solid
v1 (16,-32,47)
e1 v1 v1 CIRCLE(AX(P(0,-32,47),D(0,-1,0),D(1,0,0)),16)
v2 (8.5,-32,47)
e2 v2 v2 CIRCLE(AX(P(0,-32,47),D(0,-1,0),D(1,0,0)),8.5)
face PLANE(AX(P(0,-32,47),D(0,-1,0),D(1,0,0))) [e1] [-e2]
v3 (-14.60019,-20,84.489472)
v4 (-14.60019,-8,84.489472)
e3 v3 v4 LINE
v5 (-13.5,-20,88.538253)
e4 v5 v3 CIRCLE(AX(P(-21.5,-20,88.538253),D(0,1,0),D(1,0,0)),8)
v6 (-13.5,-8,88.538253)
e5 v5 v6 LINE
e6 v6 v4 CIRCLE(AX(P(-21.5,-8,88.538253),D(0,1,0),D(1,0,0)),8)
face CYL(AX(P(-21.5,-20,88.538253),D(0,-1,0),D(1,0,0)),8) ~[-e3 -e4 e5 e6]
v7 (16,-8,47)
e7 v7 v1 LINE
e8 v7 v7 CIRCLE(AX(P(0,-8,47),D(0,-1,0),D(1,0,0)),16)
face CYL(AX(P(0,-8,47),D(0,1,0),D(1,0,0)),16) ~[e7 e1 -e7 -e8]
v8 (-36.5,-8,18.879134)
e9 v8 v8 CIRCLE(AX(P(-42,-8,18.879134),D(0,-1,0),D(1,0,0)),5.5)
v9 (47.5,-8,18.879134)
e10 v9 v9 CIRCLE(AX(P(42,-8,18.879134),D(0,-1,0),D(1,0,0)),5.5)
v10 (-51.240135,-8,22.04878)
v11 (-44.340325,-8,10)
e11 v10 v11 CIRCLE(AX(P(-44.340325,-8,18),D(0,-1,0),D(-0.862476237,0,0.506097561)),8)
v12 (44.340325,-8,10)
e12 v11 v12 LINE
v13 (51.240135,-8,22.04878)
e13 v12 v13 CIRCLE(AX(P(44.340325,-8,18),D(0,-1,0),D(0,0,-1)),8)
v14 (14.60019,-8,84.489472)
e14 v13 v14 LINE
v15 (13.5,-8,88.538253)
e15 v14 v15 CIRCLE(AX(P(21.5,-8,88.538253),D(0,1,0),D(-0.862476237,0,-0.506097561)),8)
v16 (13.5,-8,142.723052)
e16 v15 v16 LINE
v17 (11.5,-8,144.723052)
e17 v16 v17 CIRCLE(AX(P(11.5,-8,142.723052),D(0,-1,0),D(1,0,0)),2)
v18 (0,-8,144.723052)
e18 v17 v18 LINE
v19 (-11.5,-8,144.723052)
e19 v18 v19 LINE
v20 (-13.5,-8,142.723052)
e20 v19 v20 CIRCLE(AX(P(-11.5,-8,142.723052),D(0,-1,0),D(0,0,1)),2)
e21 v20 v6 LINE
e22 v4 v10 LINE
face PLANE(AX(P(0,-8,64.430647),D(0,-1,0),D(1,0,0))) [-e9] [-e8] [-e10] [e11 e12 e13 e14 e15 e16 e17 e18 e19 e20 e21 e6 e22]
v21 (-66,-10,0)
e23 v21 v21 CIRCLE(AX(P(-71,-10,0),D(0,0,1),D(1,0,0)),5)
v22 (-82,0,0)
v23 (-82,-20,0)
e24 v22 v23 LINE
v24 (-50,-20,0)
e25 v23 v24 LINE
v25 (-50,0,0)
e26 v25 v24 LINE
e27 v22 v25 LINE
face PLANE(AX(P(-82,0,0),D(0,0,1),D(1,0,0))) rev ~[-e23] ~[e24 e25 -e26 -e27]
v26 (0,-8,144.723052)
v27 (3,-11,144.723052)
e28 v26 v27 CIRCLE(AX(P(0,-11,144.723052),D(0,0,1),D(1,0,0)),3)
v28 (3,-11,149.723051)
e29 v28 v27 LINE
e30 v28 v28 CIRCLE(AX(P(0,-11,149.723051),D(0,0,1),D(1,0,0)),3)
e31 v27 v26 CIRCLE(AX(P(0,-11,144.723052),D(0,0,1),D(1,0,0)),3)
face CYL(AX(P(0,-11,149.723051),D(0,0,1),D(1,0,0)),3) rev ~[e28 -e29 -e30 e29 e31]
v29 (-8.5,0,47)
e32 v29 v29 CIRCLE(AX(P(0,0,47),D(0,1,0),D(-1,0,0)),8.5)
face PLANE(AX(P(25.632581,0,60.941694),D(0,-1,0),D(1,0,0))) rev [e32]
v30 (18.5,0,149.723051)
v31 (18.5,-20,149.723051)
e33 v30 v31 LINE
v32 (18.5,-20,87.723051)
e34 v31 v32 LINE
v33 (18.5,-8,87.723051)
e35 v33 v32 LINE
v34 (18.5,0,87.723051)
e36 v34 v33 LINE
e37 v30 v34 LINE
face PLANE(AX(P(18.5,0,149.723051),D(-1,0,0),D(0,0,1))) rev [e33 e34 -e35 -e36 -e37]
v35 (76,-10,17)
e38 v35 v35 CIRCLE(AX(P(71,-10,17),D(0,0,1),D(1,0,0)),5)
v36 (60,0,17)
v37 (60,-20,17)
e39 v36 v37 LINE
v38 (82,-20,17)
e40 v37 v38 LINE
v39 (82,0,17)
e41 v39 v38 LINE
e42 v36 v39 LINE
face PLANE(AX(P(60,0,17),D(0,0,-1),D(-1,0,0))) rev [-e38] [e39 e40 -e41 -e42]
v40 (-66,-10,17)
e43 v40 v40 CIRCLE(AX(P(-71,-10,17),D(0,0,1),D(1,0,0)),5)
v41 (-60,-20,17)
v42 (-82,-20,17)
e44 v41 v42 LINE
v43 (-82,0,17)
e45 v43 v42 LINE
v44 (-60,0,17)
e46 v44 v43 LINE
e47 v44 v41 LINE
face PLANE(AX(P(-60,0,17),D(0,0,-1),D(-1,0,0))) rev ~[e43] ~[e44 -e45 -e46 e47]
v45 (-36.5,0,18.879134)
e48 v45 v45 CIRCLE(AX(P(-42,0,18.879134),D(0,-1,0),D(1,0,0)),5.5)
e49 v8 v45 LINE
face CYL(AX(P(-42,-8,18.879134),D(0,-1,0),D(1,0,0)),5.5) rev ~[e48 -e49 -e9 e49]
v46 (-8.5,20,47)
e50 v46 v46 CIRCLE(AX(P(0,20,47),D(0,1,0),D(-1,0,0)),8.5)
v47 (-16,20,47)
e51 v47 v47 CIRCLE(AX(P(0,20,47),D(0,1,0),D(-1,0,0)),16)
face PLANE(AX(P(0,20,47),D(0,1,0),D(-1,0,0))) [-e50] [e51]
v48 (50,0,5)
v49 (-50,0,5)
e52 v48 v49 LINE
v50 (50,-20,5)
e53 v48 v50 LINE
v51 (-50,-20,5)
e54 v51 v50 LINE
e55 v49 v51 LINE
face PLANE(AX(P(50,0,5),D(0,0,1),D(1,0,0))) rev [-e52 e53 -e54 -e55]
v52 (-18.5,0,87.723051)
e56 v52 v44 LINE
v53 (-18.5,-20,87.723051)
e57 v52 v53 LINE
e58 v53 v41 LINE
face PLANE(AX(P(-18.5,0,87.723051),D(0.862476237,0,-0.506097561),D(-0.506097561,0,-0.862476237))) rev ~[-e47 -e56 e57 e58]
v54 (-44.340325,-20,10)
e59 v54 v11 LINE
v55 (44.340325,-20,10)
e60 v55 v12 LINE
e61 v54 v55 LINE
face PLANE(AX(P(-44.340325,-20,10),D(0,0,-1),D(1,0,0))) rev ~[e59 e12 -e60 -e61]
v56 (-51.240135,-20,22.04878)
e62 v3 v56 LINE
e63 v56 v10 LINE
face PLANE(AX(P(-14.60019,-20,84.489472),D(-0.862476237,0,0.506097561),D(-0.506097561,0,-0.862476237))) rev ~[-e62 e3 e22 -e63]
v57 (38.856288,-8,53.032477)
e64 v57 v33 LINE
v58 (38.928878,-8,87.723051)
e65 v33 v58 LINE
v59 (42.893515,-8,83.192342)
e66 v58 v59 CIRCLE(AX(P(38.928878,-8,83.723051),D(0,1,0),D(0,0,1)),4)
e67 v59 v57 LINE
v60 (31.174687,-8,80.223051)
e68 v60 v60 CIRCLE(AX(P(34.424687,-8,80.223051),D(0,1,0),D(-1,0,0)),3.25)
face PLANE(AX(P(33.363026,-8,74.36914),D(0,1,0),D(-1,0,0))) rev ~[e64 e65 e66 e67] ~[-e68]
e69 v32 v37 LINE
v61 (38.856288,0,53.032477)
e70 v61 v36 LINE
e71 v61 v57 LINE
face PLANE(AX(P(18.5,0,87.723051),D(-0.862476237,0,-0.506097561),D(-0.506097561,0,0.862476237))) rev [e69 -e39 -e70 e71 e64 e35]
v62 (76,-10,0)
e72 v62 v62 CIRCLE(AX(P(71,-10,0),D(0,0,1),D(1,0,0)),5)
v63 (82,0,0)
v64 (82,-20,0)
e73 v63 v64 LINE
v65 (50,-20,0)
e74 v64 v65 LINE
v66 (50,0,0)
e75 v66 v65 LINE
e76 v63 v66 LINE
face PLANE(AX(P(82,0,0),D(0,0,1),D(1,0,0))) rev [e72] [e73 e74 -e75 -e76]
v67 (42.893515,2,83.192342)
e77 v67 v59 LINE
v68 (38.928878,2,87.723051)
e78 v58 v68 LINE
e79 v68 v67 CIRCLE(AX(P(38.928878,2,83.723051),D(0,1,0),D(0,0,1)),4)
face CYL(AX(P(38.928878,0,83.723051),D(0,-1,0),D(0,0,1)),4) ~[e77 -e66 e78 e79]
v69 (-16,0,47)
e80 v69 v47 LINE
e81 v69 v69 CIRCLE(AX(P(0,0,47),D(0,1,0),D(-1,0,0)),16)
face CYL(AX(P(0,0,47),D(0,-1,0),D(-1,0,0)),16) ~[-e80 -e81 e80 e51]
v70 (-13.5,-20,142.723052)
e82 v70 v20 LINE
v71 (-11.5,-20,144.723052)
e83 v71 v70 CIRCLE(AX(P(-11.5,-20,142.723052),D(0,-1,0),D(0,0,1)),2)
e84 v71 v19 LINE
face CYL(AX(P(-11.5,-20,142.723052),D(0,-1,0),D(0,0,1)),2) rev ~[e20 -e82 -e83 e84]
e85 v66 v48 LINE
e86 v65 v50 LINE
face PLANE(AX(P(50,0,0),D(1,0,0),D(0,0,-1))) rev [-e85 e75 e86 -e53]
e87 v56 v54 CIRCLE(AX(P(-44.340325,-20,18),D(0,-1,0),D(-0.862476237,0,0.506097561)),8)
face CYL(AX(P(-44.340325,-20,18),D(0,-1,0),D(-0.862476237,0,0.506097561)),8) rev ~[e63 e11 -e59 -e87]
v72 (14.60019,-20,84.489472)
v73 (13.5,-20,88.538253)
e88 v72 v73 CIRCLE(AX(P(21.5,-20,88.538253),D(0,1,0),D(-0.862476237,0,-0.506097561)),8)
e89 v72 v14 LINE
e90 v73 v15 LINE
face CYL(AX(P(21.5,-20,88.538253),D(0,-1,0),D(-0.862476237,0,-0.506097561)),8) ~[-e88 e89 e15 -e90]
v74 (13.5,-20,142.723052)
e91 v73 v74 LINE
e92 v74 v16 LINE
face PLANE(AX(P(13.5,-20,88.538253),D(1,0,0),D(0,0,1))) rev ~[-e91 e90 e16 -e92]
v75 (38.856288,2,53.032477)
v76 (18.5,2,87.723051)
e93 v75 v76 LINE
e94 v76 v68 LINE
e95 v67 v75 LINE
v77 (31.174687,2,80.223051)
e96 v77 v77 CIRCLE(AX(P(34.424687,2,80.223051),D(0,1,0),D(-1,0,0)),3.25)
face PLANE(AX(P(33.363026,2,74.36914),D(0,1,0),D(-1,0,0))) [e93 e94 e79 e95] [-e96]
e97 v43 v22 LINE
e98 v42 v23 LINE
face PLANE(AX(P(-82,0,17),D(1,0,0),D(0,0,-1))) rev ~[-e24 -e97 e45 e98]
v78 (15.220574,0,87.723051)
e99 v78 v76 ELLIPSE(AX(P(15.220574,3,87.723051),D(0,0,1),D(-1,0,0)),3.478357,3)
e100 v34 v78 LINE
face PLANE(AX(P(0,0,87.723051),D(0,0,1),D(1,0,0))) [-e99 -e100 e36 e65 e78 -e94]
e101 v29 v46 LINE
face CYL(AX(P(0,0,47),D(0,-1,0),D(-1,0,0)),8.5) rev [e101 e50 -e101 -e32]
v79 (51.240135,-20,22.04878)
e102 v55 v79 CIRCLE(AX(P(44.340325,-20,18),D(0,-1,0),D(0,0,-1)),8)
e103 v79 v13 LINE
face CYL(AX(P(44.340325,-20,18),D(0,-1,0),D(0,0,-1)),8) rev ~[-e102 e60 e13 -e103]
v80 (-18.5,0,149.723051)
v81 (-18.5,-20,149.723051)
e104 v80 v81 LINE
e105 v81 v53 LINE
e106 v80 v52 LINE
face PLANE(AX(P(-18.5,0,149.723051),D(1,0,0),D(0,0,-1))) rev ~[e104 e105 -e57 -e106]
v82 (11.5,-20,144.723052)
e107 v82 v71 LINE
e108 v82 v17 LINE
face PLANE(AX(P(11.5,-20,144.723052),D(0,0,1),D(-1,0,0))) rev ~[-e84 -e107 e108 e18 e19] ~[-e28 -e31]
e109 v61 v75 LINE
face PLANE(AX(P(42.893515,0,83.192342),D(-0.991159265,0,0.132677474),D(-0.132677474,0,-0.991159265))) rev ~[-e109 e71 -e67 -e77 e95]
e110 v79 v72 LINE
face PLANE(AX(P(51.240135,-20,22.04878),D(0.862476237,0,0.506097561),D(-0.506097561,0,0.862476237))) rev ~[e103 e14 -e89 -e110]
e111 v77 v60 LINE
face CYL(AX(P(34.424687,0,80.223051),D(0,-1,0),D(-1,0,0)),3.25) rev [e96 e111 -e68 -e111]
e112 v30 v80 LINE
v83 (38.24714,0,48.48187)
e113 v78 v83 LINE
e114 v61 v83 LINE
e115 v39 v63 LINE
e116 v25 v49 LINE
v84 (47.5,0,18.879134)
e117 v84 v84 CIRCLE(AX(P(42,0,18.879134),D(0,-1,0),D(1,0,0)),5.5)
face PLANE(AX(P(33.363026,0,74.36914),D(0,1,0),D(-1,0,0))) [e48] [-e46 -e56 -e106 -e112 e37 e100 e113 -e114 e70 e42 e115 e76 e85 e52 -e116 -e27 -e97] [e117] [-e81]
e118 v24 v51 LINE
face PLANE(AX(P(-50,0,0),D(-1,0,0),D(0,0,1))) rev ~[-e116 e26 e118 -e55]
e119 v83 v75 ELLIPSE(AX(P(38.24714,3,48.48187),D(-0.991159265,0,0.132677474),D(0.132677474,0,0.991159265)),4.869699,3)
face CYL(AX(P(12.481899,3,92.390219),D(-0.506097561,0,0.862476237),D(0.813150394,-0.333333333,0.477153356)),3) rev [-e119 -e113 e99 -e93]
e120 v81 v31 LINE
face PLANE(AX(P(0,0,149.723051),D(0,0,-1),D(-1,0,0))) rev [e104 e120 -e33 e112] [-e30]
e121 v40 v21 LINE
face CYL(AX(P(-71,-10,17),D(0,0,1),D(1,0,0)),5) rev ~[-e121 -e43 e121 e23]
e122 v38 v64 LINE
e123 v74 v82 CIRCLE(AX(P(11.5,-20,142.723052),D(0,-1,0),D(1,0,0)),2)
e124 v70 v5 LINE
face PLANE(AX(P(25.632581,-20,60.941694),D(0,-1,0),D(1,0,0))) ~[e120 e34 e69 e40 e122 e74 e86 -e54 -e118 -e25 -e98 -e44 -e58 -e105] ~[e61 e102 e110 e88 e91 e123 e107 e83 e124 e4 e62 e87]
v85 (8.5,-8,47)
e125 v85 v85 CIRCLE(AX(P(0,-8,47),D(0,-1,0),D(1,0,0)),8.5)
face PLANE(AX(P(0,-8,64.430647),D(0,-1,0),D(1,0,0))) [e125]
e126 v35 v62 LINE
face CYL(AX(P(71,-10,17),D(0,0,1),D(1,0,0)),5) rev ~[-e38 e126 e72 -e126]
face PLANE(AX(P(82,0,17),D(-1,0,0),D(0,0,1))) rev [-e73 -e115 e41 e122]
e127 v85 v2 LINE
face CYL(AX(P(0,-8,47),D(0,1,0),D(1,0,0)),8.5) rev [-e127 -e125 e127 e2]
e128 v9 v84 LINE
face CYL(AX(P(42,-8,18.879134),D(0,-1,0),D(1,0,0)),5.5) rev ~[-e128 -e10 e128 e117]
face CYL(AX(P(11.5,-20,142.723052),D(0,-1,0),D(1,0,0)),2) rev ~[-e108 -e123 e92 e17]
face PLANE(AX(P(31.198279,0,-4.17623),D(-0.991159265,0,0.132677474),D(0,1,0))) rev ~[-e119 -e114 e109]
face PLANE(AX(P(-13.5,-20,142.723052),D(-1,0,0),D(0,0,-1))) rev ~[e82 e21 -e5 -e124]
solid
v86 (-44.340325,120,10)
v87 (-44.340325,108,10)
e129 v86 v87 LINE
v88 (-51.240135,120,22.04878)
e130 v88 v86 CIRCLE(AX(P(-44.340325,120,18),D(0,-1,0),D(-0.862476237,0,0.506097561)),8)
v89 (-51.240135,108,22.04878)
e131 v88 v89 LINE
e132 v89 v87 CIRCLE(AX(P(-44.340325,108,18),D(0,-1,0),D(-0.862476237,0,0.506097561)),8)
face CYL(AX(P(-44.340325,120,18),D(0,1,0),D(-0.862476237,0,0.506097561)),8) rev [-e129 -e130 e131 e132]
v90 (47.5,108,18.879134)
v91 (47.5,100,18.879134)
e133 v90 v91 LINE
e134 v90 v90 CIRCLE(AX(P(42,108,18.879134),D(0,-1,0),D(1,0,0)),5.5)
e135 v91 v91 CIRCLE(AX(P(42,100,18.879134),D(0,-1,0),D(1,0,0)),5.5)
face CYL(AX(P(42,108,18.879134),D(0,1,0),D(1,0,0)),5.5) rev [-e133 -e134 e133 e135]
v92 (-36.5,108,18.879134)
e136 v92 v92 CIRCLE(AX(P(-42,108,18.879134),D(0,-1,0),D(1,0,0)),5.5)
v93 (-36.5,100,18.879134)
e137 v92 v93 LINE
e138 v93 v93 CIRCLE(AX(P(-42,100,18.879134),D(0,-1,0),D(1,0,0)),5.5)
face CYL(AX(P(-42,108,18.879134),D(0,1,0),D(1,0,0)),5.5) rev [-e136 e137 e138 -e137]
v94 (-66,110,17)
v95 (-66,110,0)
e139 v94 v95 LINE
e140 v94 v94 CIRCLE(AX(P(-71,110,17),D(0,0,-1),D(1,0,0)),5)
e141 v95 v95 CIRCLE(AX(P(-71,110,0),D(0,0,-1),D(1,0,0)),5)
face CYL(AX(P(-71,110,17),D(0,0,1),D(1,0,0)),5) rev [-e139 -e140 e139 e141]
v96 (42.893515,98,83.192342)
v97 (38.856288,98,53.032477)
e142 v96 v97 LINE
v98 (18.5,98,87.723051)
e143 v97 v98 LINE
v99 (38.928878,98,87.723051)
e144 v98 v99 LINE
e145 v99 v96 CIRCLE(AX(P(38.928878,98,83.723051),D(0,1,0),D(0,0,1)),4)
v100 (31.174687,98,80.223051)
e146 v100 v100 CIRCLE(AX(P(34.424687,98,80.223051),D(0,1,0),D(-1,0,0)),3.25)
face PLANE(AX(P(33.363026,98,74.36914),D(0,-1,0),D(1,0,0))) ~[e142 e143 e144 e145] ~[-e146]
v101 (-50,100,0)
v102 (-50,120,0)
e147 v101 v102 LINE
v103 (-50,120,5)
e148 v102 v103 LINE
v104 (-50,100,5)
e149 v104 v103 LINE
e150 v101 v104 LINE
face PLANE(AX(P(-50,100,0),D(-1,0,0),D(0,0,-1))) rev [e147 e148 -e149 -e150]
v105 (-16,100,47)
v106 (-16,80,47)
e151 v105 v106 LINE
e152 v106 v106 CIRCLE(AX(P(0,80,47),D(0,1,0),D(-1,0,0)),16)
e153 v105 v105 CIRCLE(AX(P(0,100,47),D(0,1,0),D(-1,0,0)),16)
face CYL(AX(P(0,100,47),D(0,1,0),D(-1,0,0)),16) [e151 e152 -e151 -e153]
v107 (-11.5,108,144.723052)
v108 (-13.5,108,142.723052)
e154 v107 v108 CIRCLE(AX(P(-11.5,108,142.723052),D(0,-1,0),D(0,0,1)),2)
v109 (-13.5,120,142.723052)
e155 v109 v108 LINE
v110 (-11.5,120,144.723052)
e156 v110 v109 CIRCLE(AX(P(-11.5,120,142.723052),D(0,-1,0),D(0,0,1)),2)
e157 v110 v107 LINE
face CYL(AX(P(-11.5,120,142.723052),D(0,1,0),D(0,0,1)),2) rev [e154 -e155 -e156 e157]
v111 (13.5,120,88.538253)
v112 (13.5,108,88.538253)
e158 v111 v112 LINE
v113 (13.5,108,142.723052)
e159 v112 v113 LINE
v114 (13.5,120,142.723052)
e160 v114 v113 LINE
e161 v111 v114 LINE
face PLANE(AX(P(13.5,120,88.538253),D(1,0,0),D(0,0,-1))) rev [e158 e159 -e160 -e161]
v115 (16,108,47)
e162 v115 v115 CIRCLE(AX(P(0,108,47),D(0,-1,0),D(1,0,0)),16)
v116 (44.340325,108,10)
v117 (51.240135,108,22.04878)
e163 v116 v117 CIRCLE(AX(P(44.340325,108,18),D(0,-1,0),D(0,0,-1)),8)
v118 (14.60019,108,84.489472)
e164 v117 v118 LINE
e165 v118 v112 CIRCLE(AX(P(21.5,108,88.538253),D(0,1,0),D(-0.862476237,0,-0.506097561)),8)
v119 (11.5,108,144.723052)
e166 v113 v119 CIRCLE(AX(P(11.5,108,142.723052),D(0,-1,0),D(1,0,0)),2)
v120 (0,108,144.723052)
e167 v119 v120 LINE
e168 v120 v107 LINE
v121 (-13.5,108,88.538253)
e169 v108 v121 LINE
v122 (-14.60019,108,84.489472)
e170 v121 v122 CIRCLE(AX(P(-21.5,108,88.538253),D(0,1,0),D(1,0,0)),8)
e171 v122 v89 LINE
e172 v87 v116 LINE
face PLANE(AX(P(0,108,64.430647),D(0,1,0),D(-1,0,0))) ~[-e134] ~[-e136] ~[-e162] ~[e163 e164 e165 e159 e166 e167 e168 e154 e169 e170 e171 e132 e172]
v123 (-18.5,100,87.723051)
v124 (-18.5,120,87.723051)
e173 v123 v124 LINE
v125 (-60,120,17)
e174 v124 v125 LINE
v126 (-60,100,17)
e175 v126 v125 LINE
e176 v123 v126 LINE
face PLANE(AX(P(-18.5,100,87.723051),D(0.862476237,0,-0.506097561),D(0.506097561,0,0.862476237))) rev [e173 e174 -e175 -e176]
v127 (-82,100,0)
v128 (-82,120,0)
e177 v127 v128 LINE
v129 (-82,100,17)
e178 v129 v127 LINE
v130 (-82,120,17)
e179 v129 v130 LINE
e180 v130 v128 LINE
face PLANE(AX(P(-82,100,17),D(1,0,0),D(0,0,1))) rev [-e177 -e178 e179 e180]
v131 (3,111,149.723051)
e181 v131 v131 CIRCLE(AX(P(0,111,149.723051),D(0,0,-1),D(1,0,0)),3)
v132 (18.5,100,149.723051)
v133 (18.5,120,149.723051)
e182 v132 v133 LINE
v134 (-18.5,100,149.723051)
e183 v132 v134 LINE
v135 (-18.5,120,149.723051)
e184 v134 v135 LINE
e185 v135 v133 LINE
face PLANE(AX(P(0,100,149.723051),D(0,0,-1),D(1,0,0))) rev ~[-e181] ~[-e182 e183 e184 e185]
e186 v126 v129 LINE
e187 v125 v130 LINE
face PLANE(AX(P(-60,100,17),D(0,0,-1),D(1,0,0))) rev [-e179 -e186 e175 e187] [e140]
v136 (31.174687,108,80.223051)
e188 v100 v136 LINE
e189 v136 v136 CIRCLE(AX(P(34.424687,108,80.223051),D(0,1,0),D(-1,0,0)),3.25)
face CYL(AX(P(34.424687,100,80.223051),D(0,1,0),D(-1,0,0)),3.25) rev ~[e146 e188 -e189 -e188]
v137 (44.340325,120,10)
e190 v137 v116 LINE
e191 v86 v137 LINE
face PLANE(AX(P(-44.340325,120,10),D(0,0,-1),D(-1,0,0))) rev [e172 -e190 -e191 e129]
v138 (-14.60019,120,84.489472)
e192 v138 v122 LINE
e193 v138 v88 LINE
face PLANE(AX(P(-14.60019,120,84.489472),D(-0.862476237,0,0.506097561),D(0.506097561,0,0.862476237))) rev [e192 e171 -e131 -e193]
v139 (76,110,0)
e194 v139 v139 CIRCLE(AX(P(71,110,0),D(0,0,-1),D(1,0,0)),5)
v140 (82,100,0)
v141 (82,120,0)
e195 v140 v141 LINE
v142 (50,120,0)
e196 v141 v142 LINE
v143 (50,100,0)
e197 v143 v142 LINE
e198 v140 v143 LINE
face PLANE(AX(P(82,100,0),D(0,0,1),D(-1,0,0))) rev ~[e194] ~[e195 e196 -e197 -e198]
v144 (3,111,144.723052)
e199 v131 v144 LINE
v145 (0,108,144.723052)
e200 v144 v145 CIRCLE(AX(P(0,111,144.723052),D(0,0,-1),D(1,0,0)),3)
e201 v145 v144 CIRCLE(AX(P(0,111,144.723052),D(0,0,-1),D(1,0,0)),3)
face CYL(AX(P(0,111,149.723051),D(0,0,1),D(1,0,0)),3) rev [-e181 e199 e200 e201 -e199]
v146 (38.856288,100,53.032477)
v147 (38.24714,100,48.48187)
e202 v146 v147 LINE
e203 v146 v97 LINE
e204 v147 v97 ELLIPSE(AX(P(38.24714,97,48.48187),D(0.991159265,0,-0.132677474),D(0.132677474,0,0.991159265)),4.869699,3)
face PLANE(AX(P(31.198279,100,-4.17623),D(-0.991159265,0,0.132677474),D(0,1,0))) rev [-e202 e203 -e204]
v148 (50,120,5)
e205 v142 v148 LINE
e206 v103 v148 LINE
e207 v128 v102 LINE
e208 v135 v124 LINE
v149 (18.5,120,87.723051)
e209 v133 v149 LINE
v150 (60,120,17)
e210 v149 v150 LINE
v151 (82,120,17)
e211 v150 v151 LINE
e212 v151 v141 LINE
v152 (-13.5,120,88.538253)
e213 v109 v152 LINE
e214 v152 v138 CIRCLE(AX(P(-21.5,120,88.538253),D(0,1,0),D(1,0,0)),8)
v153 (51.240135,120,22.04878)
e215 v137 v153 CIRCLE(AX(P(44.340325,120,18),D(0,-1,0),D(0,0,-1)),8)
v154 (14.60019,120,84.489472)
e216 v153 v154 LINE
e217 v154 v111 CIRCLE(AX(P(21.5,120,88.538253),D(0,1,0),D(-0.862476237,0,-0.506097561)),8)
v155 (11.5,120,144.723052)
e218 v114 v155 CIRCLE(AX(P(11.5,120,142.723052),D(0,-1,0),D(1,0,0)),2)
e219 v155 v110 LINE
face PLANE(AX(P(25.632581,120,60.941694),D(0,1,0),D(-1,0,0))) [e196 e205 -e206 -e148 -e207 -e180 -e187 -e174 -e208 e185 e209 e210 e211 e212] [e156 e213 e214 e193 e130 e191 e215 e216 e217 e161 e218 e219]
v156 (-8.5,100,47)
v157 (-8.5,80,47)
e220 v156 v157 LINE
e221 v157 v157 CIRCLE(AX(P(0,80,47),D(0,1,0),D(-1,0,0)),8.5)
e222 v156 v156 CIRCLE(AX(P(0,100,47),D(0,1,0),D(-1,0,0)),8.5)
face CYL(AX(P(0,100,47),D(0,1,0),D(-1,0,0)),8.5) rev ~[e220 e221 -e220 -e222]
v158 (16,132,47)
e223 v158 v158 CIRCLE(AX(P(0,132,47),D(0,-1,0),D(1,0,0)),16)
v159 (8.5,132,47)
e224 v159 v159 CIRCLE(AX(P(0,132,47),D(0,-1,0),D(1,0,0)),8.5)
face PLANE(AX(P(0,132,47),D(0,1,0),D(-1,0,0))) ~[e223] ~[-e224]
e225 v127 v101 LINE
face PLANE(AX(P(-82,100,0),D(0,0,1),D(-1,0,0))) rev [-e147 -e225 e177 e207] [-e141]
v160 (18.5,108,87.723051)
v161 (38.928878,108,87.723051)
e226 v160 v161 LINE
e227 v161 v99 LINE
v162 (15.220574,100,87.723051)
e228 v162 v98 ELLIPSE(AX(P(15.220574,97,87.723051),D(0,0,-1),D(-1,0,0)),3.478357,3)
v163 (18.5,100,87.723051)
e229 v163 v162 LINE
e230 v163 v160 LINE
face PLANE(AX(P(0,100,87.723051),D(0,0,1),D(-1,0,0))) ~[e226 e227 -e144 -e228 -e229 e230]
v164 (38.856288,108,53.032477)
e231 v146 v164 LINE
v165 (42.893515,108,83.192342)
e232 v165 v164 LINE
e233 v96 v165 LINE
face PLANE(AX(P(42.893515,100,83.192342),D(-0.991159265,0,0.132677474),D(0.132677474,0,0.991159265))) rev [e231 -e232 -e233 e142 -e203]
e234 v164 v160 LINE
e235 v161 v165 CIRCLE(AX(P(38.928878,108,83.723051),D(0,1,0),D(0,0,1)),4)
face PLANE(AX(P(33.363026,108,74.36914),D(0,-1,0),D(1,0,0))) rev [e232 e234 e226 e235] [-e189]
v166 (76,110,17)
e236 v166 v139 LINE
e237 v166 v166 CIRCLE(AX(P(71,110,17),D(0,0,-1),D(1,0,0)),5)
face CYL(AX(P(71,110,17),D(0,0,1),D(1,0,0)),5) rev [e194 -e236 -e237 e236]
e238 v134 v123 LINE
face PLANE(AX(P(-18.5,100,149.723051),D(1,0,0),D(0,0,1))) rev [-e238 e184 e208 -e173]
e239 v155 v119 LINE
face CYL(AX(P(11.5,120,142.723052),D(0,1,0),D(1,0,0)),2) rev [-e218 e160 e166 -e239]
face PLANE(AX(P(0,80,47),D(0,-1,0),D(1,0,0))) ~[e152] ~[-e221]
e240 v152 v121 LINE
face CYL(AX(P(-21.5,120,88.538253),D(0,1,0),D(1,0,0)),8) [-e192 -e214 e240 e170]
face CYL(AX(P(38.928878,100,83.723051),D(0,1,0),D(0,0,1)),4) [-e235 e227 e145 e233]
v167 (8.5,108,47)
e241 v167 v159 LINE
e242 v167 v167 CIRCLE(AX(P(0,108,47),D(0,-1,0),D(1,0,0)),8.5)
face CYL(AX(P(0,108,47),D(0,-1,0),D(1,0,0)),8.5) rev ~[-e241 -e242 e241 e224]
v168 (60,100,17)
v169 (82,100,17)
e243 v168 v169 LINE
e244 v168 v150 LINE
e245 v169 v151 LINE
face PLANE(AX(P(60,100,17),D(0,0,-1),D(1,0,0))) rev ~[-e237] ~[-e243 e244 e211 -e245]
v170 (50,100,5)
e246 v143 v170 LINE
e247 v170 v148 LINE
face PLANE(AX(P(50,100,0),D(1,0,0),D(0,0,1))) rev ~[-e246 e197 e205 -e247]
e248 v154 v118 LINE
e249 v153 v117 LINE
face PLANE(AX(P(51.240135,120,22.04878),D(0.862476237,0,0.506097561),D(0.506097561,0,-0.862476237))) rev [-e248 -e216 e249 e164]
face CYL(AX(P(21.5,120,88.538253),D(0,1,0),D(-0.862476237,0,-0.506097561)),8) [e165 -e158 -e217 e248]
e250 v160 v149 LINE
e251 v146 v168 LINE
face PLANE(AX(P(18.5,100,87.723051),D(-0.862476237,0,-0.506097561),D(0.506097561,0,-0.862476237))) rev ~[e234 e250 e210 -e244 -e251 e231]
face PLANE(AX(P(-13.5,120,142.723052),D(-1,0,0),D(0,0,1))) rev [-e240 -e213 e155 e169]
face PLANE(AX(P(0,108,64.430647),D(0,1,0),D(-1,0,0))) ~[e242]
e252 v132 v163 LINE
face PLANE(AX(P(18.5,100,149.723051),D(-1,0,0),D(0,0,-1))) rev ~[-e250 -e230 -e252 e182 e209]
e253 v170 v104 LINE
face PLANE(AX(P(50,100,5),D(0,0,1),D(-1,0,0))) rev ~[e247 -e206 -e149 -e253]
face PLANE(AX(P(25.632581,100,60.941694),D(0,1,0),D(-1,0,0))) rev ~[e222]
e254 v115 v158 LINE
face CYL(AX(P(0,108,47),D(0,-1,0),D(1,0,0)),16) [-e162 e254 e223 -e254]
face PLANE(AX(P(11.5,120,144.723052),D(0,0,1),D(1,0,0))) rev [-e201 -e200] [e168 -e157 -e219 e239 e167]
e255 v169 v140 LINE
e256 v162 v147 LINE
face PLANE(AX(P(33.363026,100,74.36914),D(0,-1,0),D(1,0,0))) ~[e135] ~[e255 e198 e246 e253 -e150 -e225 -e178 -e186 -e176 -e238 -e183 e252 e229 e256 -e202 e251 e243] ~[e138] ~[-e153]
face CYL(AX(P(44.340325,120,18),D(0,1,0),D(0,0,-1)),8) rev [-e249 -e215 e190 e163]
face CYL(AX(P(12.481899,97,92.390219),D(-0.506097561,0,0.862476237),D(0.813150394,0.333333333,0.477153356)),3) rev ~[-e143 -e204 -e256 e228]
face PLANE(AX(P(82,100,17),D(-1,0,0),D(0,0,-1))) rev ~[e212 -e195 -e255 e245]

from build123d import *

# Parameters (mm, degrees)
F1_DEPTH       = 20
F4_DEPTH       = 12
F5_R           = 5.5
F6_DEPTH       = 25
F7_R           = 16
F7_R_2         = 8.5
F8_DEPTH       = 24
F9_R           = 16
F9_R_2         = 8.5
F10_DEPTH      = 20
F11_R          = 5
F12_DEPTH      = 25
F13_R          = 3
F14_DEPTH      = 10
F16_R          = 3.25
F17_DEPTH      = 8
F17_DEPTH_BACK = 2
F18_T4_DEPTH   = 54.3641994781


# Not quite as in the source:
# - a fillet or chamfer that OpenCascade refuses, or shapes differently, is made with other operations: its cross-section is extruded or revolved along the edge and cut away or added


with BuildPart() as f1:
    # F0 (on Front) → F1 (new body)
    with BuildSketch(Plane.XZ):
        Polygon((0, 149.7230514048), (-18.5, 149.7230514048), (-18.5, 87.7230514048), (-60, 17), (-82, 17), (-82, 0), (-50, 0), (-50, 5), (0, 5), align=None)
    extrude(amount=F1_DEPTH)

    # F2: F1 across plane


with BuildPart() as f1_1:
    add(f1.part)
    add(f1.part.mirror(Plane.YZ))

    # F3 (on face) → F4 (cut)
    with BuildSketch(Plane.XZ.offset(20)):
        with BuildLine():
            ThreePointArc((44.3403253904, 9.9999997765), (51.2825960529, 14.0244648378), (51.2401352836, 22.0487802643))
            Line((51.2401352836, 22.0487802643), (14.6001903304, 84.489472081))
            ThreePointArc((14.6001903304, 84.489472081), (13.7799458472, 86.4404536205), (13.5000002235, 88.5382525688))
            Line((13.5000002235, 88.5382525688), (13.5000002235, 142.7230516283))
            ThreePointArc((13.5000002235, 142.7230516283), (12.9142137859, 144.1372651906), (11.5000002235, 144.7230516283))
            Line((11.5000002235, 144.7230516283), (-11.5000002235, 144.7230516283))
            ThreePointArc((-11.5000002235, 144.7230516283), (-12.9142137859, 144.1372651906), (-13.5000002235, 142.7230516283))
            Line((-13.5000002235, 142.7230516283), (-13.5000002235, 88.5382525688))
            ThreePointArc((-13.5000002235, 88.5382525688), (-13.7799458472, 86.4404536205), (-14.6001903304, 84.489472081))
            Line((-14.6001903304, 84.489472081), (-51.2401352836, 22.0487802643))
            ThreePointArc((-51.2401352836, 22.0487802643), (-51.2825960529, 14.0244648378), (-44.3403253904, 9.9999997765))
            Line((-44.3403253904, 9.9999997765), (44.3403253904, 9.9999997765))
        make_face()
    extrude(amount=-F4_DEPTH, mode=Mode.SUBTRACT)

    # F5 (on face) → F6 (cut)
    with BuildSketch(Plane.XZ.offset(8)):
        with Locations((-42, 18.8791340478)):
            Circle(F5_R)
        with Locations((42, 18.8791340478)):
            Circle(F5_R)
    extrude(amount=-F6_DEPTH, mode=Mode.SUBTRACT)

    # F7 (on face) → F8 (join)
    with BuildSketch(Plane.XZ.offset(8)):
        with Locations((0, 46.9999997765)):
            Circle(F7_R)
        with Locations((0, 46.9999997765)):
            Circle(F7_R_2, mode=Mode.SUBTRACT)
    extrude(amount=F8_DEPTH)

    # F9 (on face) → F10 (join)
    with BuildSketch(Plane(origin=(0, 0, 0), x_dir=(-1, 0, 0), z_dir=(0, 1, 0))):
        with Locations((0, 46.9999997765)):
            Circle(F9_R)
        with Locations((0, 46.9999997765)):
            Circle(F9_R_2, mode=Mode.SUBTRACT)
    extrude(amount=F10_DEPTH)

    # F11 (on face) → F12 (cut)
    with BuildSketch(Plane.XY.offset(17)):
        with Locations((-71, -10)):
            Circle(F11_R)
        with Locations((71, -10)):
            Circle(F11_R)
    extrude(amount=-F12_DEPTH, mode=Mode.SUBTRACT)

    # F13 (on face) → F14 (cut)
    with BuildSketch(Plane.XY.offset(149.7230514048)):
        with Locations((0, -11)):
            Circle(F13_R)
    extrude(amount=-F14_DEPTH, mode=Mode.SUBTRACT)

    # F16 (on face) → F17 (join, two sides)
    with BuildSketch(Plane(origin=(0, 0, 0), x_dir=(-1, 0, 0), z_dir=(0, 1, 0))) as f17_sk:
        with BuildLine():
            Line((-38.8562884141, 53.0324771416), (-18.5, 87.7230514048))
            Line((-18.5, 87.7230514048), (-38.9288780249, 87.7230514048))
            ThreePointArc((-38.9288780249, 87.7230514048), (-41.9390972513, 86.3571698928), (-42.8935150835, 83.1923415092))
            Line((-42.8935150835, 83.1923415092), (-38.8562884141, 53.0324771416))
        make_face()
        with Locations((-34.4246865011, 80.2230514048)):
            Circle(F16_R, mode=Mode.SUBTRACT)
    extrude(amount=-F17_DEPTH)
    extrude(f17_sk.sketch, amount=F17_DEPTH_BACK)

    # F18: fillet of radius 3 on 1 edges, made by hand


with BuildPart() as f18_tool2:
    # F18_s3 → F18_t4 (new body)
    with BuildSketch(Plane(origin=(-37.1310167355, 0, 63.2775615735), x_dir=(0, 1, 0), z_dir=(0.506097561, 0, -0.8624762366))):
        with BuildLine():
            ThreePointArc((2, 60.3522327352), (0.5505102572, 59.255856418), (0, 57.5238056104))
            Line((0, 57.5238056104), (0, 60.3522327352))
            Line((0, 60.3522327352), (2, 60.3522327352))
        make_face()
    extrude(amount=F18_T4_DEPTH)

    split(bisect_by=Plane(origin=(31.1982792576, 0, -4.176229824), x_dir=(0, 1, 0), z_dir=(-0.9911592647, 0, 0.1326774739)), keep=Keep.TOP)

    split(bisect_by=Plane.XY.offset(87.7230514048), keep=Keep.BOTTOM)


with BuildPart() as f1_2:
    add(f1_1.part)

    # F18_t1: union F18_tool2
    add(f18_tool2.part)


with BuildPart() as f19_1:
    # F19: instance of F1
    add(f1_2.part.mirror(Plane(origin=(0, 50, 55.7488868878), x_dir=(-1, 0, 0), z_dir=(0, 1, 0))))


solid = Compound([f1_2.part, f19_1.part])
